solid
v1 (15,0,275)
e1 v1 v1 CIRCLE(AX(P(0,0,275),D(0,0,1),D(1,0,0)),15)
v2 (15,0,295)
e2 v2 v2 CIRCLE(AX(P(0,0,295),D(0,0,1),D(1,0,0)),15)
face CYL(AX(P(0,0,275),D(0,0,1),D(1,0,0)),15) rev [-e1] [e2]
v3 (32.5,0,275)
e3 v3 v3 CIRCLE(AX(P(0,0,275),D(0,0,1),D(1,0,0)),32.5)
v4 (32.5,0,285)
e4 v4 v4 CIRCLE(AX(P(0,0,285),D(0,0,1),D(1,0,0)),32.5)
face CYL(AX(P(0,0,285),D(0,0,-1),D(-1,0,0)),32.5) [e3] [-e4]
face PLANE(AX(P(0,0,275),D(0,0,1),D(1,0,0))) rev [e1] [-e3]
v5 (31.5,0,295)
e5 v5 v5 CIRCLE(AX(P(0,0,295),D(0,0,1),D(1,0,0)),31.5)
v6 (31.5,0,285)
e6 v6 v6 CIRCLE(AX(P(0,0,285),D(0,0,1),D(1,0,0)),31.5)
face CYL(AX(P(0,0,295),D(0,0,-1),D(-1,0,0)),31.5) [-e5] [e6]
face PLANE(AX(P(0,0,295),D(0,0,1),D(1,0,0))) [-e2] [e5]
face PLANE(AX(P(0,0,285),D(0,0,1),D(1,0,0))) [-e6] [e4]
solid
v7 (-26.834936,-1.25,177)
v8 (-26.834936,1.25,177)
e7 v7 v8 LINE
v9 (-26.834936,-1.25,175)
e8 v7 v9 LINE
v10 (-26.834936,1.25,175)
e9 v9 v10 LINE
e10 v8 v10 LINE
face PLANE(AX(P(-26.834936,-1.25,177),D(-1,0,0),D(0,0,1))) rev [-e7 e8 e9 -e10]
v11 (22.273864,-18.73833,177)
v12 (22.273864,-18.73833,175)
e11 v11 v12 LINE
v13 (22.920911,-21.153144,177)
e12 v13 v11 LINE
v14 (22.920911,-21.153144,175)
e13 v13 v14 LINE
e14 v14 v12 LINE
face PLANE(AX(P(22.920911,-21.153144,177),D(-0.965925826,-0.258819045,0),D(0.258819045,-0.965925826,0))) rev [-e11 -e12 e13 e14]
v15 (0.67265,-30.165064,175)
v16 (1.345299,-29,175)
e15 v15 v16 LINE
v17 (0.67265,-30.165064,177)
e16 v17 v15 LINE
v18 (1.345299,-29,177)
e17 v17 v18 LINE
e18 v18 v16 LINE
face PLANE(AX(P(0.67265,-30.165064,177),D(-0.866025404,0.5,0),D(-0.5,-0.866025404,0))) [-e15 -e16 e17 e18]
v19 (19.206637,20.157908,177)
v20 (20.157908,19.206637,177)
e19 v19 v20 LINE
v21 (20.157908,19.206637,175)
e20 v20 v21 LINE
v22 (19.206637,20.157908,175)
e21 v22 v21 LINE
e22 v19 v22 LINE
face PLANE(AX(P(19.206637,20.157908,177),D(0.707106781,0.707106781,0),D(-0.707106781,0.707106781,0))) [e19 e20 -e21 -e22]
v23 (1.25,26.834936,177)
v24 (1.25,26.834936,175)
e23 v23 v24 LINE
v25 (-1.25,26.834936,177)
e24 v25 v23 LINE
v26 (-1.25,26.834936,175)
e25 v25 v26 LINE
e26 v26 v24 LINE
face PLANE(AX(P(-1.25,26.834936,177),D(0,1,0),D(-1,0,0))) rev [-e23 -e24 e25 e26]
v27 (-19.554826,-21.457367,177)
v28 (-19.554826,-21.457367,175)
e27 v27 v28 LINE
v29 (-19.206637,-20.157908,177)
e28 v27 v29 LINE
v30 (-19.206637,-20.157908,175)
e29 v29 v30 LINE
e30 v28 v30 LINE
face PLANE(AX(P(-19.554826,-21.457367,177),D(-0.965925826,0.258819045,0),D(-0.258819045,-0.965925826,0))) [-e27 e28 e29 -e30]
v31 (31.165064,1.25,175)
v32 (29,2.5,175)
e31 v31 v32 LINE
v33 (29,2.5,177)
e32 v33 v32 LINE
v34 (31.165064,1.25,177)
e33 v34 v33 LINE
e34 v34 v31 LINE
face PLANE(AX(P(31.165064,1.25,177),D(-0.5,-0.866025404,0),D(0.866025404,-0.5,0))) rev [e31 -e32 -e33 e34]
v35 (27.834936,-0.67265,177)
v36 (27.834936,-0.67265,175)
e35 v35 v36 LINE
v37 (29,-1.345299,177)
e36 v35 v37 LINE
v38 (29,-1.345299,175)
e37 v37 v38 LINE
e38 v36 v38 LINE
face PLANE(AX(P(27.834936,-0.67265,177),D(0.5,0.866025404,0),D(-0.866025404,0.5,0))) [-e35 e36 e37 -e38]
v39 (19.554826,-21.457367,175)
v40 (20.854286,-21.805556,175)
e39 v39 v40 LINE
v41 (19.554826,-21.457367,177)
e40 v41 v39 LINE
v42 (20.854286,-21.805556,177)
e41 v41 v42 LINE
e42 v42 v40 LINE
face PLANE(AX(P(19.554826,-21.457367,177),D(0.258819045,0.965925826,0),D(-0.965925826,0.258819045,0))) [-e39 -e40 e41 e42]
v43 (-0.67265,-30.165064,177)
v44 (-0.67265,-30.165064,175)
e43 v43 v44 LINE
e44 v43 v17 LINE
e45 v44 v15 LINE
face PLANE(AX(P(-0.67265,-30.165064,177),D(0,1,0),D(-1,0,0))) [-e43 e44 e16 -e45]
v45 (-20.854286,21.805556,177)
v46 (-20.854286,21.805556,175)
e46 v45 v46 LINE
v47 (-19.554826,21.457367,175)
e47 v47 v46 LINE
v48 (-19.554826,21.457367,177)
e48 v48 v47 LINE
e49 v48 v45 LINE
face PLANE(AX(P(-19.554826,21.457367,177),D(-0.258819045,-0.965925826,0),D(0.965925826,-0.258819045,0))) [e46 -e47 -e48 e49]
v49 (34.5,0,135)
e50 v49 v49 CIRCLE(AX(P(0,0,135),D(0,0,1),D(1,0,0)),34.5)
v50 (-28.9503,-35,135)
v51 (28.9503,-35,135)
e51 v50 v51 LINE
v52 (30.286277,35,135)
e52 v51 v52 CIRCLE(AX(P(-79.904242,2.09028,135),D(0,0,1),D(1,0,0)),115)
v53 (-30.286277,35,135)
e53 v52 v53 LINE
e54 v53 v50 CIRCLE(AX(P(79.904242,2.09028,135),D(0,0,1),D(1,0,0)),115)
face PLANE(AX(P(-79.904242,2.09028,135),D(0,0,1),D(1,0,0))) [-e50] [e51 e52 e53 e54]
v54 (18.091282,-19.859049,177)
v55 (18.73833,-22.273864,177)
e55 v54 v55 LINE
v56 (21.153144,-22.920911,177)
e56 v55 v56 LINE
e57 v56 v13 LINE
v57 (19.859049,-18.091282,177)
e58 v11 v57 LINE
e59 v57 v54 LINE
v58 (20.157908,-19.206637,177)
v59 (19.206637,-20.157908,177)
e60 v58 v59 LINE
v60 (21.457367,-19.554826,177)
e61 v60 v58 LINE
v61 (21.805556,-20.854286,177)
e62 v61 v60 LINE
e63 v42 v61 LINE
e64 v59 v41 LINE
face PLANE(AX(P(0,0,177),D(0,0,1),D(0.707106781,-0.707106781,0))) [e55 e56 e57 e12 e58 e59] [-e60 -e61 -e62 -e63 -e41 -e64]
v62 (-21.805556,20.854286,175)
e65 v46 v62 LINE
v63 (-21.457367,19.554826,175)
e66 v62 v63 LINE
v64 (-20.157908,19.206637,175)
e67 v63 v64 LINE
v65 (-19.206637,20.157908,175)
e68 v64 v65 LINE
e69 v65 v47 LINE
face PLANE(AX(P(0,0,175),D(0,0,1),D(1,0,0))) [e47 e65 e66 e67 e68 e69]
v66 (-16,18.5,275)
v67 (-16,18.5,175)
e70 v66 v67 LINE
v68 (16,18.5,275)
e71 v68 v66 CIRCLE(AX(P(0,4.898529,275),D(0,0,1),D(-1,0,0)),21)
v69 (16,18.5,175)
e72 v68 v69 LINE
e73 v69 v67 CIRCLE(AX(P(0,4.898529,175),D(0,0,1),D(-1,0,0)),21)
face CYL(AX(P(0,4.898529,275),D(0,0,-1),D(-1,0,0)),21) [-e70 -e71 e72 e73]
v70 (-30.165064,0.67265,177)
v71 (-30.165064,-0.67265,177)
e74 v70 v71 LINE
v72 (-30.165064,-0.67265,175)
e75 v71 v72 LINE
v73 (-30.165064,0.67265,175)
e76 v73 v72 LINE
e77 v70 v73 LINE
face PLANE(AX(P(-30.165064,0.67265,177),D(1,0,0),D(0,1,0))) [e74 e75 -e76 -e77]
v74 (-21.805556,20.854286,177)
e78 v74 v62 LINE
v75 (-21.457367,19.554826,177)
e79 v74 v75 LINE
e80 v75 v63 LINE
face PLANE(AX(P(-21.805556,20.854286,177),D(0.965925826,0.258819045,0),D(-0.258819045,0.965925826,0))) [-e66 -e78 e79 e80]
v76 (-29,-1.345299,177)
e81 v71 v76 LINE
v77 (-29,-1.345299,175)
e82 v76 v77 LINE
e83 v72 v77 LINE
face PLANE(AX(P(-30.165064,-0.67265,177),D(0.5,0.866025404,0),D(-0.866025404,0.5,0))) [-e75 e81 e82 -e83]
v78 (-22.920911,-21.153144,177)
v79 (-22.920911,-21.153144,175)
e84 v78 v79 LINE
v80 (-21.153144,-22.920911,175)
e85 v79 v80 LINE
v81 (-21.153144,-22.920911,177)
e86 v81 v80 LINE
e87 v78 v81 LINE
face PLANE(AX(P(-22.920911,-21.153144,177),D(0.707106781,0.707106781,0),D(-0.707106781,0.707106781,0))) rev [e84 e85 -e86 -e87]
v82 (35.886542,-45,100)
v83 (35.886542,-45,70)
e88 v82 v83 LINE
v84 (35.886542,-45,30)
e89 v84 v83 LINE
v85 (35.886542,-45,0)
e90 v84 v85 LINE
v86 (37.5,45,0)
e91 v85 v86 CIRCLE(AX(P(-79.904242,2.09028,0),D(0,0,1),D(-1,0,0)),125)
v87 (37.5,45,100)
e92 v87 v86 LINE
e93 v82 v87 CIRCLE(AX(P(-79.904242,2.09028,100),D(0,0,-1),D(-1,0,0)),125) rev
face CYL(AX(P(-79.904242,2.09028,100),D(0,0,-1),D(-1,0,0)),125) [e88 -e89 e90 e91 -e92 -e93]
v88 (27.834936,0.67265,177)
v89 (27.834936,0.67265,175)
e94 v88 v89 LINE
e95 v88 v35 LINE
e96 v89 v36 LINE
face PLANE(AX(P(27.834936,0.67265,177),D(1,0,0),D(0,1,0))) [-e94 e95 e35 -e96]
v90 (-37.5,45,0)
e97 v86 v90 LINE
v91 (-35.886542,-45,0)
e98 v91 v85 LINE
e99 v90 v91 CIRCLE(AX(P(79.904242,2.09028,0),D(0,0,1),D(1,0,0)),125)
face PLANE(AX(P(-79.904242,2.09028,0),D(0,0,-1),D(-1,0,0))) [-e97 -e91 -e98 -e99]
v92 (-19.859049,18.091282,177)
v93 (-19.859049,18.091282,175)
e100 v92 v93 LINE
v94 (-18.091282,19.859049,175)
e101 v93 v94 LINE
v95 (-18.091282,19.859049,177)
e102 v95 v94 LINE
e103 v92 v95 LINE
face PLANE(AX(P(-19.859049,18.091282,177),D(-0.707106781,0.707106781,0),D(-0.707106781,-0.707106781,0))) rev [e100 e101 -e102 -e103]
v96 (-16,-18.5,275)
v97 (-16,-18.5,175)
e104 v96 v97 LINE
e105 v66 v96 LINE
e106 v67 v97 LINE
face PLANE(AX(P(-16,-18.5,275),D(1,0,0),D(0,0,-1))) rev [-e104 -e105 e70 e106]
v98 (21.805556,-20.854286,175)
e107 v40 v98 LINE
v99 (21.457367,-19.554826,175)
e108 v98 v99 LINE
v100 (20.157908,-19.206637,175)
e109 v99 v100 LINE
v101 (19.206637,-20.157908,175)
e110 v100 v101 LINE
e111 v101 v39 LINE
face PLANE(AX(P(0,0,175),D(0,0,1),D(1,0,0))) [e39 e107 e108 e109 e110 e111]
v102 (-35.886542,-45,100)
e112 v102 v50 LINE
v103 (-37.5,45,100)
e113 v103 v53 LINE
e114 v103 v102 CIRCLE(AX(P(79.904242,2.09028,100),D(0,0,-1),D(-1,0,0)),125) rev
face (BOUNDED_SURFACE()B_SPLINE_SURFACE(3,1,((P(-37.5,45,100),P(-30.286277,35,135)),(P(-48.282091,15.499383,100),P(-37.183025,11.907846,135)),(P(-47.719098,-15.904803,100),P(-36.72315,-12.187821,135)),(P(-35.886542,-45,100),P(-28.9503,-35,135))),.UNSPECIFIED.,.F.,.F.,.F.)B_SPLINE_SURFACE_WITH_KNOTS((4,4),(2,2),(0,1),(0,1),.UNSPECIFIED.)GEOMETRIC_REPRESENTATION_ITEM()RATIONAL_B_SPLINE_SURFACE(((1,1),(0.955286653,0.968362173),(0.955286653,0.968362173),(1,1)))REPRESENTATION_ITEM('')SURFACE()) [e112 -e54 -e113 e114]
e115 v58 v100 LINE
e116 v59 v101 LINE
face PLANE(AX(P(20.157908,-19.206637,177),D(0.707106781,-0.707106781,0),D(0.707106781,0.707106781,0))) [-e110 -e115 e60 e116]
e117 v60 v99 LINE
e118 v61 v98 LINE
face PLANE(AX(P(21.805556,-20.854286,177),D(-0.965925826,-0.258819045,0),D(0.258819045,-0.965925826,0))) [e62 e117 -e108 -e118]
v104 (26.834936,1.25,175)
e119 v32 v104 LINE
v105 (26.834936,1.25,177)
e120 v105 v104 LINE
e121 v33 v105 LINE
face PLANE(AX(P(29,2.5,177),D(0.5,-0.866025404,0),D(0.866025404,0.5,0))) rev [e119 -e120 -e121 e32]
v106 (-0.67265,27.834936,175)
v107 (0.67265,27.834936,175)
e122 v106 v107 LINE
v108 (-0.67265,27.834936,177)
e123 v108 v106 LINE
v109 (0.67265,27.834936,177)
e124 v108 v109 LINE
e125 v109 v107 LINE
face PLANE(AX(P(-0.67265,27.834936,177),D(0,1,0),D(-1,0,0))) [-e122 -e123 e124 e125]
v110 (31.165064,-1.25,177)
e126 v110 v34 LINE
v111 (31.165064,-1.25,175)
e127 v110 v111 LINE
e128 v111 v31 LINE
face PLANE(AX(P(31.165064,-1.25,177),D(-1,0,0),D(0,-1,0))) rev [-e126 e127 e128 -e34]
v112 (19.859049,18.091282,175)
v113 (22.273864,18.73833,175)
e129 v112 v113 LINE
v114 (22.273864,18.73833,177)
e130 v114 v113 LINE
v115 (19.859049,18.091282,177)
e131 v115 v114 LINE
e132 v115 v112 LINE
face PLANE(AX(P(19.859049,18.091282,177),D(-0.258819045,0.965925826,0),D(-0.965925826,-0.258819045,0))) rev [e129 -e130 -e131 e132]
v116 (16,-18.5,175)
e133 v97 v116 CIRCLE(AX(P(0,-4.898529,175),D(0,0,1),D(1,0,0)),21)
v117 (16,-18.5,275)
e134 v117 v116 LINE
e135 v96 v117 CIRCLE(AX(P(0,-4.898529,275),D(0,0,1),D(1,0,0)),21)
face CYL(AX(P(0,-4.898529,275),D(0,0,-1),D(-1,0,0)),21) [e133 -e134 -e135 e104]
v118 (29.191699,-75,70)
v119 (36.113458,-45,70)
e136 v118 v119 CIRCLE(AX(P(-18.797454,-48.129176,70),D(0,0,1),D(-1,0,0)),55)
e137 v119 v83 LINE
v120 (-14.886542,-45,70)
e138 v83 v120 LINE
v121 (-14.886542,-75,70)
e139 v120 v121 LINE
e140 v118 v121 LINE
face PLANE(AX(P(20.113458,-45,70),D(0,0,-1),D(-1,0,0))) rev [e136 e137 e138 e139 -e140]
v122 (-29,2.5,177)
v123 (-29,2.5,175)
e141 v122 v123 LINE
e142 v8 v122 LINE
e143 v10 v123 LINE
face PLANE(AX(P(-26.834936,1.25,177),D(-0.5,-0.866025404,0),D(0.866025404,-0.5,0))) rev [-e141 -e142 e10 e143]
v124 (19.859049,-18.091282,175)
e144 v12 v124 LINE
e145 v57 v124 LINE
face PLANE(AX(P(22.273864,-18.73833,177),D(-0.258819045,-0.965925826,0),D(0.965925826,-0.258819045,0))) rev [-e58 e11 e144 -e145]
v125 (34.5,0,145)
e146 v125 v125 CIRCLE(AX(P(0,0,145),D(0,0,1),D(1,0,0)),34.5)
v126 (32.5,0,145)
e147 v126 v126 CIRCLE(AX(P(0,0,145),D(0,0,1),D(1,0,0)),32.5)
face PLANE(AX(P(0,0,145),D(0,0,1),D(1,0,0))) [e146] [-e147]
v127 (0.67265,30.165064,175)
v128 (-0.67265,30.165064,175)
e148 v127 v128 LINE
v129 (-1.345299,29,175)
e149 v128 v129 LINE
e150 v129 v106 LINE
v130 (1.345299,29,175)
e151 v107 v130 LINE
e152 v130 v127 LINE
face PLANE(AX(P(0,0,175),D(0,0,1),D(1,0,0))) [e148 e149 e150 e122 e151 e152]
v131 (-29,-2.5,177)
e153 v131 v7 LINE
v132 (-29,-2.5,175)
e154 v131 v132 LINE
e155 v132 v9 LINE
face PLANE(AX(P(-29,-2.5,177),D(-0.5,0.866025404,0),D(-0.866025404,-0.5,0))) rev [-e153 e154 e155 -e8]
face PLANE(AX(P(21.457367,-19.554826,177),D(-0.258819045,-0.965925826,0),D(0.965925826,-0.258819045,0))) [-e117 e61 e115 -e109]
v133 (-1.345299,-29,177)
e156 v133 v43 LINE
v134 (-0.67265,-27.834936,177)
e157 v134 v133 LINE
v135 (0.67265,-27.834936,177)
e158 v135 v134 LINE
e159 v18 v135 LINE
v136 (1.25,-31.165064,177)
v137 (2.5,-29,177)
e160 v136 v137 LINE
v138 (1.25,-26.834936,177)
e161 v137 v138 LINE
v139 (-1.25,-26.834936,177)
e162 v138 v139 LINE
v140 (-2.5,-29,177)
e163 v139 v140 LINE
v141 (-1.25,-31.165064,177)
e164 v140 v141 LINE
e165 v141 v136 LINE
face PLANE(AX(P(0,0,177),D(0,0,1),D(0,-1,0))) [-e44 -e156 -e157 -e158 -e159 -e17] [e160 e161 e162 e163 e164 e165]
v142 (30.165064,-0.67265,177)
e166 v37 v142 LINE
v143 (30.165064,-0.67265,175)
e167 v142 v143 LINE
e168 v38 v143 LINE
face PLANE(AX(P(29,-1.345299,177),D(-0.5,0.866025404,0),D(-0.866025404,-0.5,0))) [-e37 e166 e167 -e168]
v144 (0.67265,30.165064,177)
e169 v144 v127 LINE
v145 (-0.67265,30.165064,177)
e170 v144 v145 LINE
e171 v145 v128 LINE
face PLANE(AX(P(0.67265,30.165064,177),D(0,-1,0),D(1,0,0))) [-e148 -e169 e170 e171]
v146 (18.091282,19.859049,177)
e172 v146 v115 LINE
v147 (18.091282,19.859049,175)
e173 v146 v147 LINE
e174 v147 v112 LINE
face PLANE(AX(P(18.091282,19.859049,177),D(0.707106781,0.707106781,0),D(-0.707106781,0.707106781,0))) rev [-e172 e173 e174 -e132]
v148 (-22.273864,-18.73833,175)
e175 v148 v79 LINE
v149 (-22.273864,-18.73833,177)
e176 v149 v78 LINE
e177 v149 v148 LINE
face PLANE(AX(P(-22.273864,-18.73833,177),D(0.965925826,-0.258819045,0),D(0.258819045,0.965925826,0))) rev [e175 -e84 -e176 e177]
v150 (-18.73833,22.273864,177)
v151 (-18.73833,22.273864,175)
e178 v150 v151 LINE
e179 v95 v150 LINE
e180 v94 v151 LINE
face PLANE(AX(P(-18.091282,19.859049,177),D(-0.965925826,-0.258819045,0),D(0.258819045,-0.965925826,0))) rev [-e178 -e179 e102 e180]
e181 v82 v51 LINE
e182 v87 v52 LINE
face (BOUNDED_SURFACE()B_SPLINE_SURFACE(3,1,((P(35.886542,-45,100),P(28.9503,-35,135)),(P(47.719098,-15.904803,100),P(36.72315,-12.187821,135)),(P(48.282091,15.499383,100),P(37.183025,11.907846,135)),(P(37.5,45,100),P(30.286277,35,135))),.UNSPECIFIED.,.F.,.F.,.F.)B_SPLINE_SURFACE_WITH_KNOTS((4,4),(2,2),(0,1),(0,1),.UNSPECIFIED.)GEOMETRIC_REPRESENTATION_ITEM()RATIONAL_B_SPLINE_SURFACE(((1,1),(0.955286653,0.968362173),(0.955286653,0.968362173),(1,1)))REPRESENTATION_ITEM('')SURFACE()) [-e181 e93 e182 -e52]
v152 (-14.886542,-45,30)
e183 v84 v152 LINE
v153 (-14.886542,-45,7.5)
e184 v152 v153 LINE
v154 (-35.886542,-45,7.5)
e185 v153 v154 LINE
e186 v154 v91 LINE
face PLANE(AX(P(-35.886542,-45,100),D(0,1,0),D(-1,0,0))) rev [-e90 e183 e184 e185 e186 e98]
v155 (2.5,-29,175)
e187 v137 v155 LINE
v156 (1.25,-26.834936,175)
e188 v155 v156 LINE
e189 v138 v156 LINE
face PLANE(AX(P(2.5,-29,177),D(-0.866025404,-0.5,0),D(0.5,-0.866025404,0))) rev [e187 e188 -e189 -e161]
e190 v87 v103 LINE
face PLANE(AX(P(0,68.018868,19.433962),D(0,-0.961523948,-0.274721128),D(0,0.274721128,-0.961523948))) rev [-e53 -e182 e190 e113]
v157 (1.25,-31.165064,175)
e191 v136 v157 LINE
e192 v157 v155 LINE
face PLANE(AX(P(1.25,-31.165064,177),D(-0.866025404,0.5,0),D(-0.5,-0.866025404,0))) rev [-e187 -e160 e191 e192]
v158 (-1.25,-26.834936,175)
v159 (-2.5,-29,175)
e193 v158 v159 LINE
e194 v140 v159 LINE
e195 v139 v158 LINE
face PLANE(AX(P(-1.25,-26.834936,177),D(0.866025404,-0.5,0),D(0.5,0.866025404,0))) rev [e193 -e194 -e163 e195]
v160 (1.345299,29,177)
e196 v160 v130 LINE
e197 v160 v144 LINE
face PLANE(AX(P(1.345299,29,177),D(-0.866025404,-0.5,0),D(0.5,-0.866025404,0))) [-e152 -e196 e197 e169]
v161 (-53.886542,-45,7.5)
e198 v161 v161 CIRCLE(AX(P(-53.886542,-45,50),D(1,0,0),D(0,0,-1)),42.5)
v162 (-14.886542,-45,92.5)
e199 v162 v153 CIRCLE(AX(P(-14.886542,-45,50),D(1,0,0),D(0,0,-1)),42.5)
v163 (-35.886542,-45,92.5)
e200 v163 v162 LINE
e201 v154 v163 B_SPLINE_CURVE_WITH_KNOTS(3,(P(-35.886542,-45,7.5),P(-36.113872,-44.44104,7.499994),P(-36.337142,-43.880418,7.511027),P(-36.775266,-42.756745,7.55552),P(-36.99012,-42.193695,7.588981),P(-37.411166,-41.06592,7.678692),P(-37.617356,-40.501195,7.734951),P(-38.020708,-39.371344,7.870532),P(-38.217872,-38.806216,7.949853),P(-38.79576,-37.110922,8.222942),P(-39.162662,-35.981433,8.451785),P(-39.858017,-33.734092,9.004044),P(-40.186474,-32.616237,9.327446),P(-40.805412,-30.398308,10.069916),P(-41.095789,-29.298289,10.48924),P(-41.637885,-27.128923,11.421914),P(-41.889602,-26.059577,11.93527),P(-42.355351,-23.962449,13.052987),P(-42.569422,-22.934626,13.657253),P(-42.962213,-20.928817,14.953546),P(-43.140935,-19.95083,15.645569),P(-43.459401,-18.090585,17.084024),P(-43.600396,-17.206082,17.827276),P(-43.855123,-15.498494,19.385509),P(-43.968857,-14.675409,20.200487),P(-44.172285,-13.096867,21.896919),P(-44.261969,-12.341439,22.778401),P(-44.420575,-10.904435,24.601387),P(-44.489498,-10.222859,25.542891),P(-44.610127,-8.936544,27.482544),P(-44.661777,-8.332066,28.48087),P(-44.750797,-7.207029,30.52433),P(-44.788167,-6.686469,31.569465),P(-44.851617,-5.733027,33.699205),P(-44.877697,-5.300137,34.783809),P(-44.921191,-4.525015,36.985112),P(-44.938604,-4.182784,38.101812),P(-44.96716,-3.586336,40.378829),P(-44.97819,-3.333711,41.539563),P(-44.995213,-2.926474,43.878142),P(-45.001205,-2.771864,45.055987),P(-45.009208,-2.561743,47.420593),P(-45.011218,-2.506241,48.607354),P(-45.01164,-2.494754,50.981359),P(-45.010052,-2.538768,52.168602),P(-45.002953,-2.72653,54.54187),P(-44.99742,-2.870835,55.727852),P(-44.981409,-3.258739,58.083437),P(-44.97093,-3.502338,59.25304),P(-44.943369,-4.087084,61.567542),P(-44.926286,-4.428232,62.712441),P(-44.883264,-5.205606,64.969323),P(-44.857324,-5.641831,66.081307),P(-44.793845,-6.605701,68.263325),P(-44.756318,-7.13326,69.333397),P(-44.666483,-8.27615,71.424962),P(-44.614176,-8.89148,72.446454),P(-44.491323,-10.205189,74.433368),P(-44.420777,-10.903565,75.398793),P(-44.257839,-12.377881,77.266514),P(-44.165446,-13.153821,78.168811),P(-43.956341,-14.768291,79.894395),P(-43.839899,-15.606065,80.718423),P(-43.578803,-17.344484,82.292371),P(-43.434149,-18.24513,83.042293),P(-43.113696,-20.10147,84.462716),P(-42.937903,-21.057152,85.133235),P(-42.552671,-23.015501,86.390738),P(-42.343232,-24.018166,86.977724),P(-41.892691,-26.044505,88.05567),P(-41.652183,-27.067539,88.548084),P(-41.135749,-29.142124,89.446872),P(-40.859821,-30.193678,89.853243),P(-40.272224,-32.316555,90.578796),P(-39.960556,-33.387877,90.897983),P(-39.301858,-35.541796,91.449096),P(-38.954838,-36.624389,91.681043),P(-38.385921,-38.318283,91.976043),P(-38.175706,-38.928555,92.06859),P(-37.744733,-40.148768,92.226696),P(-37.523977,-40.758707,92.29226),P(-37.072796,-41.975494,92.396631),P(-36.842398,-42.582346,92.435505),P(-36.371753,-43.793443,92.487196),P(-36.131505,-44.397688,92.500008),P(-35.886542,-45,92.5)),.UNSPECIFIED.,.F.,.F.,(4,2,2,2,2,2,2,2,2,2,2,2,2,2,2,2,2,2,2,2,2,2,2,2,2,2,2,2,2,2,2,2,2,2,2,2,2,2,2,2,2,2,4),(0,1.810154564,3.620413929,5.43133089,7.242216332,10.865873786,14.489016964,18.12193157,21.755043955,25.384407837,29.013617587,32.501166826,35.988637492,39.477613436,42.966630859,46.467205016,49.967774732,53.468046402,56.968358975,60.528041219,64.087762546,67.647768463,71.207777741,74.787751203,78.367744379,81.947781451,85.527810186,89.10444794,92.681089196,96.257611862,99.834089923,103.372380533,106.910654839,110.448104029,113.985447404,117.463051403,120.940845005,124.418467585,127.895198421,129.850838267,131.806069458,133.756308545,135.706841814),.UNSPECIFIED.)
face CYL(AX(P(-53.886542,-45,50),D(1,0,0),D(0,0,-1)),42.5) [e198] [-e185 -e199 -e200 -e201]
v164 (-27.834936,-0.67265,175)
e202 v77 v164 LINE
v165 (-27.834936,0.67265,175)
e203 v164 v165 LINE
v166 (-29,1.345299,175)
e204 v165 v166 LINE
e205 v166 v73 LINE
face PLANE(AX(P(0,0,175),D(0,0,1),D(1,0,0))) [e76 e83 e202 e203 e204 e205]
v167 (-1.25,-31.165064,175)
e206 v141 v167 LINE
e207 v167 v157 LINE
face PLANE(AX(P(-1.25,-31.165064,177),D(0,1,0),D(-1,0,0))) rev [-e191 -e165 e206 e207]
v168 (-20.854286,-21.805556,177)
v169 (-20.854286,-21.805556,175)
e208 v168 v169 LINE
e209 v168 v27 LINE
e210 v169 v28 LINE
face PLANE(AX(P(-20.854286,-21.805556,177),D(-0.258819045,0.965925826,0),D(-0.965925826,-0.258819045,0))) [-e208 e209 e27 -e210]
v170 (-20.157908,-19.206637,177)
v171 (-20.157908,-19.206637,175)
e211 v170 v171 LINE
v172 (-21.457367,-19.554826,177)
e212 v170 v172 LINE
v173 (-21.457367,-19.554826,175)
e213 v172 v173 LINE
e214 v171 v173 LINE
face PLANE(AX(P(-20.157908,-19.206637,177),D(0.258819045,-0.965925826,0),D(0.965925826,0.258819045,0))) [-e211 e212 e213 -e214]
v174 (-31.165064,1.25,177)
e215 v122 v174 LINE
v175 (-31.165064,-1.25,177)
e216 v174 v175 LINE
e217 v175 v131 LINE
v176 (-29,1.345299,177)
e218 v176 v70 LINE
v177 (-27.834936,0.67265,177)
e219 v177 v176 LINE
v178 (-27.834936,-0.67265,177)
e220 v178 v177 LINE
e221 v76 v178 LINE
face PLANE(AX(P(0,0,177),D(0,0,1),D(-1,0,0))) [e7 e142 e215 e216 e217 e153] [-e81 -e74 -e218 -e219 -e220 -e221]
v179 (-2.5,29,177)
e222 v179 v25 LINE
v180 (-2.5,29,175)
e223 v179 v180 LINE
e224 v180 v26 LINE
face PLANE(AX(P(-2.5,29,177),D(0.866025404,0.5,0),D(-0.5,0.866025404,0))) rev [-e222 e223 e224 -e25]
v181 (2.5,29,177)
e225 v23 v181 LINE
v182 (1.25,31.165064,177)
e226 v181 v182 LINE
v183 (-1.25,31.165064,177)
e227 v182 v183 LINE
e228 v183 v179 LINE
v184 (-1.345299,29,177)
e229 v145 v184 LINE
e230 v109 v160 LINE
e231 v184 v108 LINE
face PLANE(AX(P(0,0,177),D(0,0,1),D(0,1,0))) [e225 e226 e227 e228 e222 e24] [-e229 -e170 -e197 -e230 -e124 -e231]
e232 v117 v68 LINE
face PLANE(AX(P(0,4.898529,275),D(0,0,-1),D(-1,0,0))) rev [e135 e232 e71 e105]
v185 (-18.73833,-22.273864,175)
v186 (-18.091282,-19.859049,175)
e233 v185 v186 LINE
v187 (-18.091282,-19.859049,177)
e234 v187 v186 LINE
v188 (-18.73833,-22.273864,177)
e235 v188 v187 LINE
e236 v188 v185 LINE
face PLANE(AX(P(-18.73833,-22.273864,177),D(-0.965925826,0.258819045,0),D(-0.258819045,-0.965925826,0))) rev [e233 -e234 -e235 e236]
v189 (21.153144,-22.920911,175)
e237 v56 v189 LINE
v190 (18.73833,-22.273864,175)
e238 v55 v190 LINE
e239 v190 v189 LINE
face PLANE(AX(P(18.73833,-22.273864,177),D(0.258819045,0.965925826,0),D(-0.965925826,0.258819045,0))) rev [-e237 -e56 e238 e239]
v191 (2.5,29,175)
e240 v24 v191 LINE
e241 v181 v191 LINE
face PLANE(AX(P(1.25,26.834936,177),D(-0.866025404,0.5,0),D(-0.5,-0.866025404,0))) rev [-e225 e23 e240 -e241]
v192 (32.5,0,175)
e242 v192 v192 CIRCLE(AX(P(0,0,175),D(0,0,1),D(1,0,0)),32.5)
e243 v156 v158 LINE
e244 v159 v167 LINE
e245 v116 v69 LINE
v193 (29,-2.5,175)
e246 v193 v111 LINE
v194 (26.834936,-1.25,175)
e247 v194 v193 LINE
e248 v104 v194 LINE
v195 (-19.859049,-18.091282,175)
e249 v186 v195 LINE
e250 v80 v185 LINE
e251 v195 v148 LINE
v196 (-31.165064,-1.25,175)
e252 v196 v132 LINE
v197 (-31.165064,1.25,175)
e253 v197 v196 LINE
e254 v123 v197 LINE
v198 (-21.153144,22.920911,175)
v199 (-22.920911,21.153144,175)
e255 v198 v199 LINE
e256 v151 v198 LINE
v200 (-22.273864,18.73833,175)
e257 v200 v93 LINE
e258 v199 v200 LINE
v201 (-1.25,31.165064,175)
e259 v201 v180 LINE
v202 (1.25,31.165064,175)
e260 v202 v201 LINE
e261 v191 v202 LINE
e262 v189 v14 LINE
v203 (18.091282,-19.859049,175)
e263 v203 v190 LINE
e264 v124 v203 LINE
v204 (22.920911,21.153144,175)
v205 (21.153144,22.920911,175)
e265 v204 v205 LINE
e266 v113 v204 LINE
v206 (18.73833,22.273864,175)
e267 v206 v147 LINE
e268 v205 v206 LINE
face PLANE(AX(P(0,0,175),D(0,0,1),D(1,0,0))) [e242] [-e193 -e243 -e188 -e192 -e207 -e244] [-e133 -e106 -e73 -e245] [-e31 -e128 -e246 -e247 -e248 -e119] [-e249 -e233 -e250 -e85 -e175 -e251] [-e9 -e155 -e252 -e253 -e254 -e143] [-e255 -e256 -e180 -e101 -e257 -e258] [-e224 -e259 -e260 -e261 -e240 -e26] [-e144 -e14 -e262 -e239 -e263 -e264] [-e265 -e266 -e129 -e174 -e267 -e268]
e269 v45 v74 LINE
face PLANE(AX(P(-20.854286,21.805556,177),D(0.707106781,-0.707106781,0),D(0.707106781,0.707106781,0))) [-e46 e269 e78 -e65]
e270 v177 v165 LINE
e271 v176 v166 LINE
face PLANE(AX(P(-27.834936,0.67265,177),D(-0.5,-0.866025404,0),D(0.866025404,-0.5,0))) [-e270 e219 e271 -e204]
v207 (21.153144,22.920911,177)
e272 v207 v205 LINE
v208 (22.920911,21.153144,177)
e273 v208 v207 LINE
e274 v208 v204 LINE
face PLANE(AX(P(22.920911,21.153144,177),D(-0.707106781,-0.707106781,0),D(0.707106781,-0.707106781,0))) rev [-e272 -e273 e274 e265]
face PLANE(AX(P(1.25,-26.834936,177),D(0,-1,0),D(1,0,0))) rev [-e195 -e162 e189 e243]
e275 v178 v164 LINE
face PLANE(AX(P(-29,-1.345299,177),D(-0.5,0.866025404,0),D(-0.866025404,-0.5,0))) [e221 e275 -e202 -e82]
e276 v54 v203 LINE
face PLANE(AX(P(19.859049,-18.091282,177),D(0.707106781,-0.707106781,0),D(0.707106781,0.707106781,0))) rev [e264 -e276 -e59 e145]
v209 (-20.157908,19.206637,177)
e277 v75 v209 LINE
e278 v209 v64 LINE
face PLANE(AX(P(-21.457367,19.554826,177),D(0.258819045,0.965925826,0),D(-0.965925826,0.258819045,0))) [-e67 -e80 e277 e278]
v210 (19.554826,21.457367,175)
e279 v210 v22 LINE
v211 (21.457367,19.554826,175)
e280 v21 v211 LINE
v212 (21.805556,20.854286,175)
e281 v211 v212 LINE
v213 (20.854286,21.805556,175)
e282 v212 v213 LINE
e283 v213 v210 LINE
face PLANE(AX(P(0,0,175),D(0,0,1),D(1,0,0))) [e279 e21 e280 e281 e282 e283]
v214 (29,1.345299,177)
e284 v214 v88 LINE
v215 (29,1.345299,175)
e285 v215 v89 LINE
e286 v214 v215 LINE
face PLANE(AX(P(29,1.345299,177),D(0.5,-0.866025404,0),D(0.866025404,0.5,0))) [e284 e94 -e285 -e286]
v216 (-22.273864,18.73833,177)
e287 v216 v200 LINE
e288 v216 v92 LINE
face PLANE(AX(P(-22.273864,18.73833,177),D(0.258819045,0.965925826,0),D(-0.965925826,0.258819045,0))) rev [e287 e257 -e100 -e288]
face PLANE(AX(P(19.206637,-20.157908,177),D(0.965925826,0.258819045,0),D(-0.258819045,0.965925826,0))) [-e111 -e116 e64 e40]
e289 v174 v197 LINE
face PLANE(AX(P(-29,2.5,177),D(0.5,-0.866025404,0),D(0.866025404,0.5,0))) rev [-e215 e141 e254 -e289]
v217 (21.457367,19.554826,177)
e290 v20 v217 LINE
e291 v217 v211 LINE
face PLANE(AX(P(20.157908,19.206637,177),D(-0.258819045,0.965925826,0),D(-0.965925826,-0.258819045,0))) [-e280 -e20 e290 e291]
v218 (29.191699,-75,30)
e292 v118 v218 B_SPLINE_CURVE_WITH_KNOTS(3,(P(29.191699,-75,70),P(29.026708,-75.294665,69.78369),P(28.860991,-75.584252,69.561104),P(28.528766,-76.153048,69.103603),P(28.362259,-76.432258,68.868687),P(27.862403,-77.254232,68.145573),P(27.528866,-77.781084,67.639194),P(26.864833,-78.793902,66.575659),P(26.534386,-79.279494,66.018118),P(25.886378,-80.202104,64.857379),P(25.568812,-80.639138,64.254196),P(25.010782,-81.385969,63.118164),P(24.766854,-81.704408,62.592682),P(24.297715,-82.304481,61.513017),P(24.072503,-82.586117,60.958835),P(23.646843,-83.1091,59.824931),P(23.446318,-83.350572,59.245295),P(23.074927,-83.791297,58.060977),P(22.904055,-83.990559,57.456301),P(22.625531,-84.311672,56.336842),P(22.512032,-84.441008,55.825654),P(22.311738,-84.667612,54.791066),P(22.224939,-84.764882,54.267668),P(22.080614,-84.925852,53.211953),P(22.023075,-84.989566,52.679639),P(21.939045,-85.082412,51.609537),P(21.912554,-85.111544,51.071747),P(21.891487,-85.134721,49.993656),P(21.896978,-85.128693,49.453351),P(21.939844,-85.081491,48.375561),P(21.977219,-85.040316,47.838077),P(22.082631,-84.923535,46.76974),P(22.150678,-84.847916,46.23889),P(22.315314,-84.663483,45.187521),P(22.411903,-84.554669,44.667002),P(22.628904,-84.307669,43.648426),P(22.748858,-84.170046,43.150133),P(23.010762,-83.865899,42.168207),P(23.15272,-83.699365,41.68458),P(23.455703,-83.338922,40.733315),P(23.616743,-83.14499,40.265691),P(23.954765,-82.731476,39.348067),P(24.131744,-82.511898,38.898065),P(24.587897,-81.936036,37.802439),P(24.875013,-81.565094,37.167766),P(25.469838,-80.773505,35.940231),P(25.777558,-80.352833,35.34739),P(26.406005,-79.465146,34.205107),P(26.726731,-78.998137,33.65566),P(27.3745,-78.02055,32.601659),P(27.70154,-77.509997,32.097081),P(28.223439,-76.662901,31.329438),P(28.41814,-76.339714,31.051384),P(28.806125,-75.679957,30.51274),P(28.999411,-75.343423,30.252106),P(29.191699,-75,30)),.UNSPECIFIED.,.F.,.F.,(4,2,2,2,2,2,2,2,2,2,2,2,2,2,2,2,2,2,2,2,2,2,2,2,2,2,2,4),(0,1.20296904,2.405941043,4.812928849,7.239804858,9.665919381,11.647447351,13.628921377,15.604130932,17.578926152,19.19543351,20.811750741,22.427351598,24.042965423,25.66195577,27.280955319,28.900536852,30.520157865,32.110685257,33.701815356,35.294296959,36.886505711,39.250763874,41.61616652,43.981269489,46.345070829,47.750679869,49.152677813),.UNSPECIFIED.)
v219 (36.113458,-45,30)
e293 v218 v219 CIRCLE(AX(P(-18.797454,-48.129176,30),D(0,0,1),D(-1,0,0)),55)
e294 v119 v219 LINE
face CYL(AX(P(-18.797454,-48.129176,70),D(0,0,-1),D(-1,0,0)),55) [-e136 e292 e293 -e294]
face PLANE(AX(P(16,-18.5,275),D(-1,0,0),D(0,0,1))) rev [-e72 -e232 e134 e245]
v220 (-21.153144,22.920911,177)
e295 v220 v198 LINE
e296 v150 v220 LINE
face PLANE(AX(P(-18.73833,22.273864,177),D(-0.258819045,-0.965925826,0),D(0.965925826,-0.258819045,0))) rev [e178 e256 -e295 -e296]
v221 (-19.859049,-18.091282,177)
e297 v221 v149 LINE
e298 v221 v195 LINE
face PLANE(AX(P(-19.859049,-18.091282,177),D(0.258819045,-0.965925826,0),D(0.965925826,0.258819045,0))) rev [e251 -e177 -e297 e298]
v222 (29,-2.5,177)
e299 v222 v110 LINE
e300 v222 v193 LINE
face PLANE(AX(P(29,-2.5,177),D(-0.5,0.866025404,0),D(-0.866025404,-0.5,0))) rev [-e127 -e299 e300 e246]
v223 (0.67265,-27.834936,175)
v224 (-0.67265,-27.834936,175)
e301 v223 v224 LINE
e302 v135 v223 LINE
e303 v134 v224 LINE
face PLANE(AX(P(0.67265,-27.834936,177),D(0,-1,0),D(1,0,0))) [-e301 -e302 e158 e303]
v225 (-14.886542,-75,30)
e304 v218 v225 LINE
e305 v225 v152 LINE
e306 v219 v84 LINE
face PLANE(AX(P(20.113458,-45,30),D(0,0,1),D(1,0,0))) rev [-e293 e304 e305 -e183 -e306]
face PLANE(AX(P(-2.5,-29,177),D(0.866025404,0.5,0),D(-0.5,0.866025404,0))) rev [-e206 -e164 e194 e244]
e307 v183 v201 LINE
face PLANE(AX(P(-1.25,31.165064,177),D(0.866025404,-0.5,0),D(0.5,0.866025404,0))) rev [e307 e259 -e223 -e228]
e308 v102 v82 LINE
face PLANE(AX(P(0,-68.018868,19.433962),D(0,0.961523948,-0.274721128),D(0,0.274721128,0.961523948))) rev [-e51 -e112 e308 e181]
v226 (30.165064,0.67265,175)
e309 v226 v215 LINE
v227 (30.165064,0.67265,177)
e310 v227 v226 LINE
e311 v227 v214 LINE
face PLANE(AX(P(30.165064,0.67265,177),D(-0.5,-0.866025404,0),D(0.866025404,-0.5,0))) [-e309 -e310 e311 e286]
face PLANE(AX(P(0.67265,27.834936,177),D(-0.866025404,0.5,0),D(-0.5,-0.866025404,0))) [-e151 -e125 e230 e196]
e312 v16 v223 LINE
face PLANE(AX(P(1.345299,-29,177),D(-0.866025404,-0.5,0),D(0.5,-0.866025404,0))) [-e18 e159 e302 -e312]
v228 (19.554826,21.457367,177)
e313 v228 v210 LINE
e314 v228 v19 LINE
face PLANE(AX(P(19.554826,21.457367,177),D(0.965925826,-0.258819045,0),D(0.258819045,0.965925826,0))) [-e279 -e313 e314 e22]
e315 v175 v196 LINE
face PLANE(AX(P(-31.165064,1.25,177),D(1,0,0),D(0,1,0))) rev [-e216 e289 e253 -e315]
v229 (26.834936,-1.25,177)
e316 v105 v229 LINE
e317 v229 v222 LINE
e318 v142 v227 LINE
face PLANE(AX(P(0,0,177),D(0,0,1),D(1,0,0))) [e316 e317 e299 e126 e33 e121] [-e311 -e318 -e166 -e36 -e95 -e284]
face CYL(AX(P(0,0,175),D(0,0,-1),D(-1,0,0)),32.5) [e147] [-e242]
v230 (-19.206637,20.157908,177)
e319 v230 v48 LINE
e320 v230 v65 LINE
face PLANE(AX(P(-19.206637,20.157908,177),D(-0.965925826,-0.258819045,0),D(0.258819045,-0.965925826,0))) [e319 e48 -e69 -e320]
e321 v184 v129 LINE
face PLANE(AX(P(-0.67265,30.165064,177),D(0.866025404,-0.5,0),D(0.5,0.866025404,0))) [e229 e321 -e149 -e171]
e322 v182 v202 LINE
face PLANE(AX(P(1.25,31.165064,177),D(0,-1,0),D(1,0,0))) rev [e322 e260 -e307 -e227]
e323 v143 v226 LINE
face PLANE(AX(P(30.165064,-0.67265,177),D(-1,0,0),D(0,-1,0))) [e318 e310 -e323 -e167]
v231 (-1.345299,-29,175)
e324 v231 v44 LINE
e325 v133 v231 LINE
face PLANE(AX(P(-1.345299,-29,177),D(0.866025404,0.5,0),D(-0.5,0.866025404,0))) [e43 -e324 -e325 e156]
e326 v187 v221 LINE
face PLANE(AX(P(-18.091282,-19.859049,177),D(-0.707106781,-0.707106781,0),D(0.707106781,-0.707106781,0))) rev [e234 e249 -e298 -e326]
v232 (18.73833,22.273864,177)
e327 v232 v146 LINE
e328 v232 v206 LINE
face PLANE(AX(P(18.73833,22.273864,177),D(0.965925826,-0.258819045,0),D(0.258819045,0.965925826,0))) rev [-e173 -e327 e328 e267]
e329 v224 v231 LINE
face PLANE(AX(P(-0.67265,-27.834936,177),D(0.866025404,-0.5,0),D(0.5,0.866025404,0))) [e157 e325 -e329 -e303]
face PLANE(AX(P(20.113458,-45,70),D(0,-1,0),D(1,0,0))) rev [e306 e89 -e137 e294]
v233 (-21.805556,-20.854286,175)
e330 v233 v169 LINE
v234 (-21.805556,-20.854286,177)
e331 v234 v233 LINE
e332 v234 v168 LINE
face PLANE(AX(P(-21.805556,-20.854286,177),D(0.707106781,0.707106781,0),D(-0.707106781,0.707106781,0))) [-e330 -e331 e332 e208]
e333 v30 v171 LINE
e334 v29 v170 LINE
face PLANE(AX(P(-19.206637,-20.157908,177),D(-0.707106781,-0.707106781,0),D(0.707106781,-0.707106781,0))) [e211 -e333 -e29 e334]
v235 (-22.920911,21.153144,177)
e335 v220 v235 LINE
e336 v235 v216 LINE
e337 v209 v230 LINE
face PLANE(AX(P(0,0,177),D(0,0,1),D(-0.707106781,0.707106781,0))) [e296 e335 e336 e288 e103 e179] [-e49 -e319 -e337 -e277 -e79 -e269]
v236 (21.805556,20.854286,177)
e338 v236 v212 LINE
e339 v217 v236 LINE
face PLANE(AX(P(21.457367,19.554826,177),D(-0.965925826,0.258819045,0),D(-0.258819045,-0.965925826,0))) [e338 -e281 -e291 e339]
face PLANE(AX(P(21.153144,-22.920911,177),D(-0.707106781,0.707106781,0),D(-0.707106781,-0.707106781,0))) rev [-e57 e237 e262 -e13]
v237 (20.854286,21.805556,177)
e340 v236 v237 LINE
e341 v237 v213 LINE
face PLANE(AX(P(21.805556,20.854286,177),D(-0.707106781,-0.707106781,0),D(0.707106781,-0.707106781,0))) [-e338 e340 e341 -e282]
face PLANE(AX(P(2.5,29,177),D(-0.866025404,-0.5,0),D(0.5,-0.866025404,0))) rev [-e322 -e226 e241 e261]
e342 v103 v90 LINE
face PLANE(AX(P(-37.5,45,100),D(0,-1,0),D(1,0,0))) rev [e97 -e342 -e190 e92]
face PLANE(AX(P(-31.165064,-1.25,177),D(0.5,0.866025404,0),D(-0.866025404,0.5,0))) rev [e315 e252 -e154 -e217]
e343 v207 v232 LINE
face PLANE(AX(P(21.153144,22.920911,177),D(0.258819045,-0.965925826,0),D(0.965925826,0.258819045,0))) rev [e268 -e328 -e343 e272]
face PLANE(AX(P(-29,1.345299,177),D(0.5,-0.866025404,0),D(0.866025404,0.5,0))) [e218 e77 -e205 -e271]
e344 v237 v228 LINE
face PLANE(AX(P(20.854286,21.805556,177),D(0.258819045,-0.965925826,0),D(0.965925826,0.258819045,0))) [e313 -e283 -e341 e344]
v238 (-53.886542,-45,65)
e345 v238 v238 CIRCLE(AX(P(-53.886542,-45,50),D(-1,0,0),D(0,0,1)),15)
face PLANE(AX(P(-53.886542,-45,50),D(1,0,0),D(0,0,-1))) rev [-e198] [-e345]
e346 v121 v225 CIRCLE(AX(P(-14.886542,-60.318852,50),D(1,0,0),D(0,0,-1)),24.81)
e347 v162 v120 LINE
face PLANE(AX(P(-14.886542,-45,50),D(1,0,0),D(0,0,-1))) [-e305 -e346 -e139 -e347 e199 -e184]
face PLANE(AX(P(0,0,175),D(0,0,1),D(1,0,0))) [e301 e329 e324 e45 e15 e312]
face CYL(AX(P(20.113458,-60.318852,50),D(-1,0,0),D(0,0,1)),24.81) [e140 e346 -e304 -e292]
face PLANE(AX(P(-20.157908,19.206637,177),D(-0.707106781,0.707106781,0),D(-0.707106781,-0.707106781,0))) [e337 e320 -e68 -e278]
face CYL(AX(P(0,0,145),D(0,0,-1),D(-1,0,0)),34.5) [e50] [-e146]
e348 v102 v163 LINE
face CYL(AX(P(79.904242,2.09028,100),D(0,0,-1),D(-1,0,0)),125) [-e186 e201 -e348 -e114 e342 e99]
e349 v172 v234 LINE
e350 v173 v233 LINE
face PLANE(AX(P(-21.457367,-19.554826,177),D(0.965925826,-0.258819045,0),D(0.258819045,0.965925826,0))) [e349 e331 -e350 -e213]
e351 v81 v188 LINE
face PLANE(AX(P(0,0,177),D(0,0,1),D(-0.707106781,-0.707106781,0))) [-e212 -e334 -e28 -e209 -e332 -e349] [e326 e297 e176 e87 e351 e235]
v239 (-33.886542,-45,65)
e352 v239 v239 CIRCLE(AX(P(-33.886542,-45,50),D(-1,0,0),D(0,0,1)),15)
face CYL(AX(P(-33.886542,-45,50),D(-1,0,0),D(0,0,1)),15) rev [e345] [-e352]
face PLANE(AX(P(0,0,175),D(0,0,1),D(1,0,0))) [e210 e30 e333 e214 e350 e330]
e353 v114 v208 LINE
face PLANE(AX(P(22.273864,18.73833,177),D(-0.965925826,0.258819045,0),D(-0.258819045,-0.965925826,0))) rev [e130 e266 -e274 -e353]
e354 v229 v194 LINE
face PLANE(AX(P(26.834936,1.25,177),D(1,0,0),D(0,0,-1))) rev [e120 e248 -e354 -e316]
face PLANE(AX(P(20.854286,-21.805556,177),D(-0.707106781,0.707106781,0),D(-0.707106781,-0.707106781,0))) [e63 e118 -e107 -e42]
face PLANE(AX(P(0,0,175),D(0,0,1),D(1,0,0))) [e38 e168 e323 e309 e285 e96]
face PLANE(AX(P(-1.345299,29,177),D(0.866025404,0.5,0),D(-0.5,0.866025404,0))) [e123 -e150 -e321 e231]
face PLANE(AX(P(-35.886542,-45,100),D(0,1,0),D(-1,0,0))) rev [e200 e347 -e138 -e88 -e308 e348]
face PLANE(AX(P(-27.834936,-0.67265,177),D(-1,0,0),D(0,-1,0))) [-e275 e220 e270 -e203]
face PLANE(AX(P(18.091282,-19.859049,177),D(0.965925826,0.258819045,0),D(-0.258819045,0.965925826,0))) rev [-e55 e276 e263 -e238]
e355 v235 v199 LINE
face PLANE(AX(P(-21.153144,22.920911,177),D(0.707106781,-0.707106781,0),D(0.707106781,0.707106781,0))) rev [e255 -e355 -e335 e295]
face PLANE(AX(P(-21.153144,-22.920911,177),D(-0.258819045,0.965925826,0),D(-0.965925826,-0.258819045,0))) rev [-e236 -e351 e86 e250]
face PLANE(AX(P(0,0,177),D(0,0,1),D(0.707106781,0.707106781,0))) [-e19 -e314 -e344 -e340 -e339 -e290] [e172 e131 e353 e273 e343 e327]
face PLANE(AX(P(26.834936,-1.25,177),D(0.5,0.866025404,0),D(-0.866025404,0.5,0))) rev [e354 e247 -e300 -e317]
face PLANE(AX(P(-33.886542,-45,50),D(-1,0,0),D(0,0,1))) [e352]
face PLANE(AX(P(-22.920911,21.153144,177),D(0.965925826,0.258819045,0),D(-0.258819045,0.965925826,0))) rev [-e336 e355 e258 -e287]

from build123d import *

# Parameters (mm, degrees)
BOSS_EXTRU_1_DEPTH           = 100
ESQUISSE4_R                  = 34.5
BOSS_EXTRU_2_DEPTH           = 10
ESQUISSE5_R                  = 32.5
BOSS_EXTRU_3_DEPTH           = 30
BOSS_EXTRU_4_DEPTH           = 2
R_P_TITION_START             = 175
R_P_TITION_CIRCULAIRE1_DEPTH = 2
BOSS_EXTRU_5_DEPTH           = 100
ESQUISSE8_R                  = 32.5
BOSS_EXTRU_6_DEPTH           = 10
ESQUISSE9_R                  = 31.5
BOSS_EXTRU_7_DEPTH           = 10
BOSS_EXTRU_8_DEPTH           = 21
BOSS_EXTRU_8_DEPTH_BACK      = 18
ESQUISSE11_R                 = 42.5
BOSS_EXTRU_9_DEPTH           = 35
BOSS_EXTRU_10_DEPTH          = 20
BOSS_EXTRU_10_DEPTH_BACK     = 20
ENL_V_MAT_EXTRU_1_DEPTH      = 317.476302481
ESQUISSE15_R                 = 15
ENL_V_MAT_EXTRU_2_DEPTH      = 20
ESQUISSE16_R                 = 15
ENL_V_MAT_EXTRU_3_DEPTH      = 20


# Read off the part's stored shape, not the designer's step: Répétition circulaire1
with BuildPart() as part:
    # Esquisse1 → Boss.-Extru.1 (new body)
    with BuildSketch(Plane.XY):
        with BuildLine():
            Line((-37.5, 45), (37.5, 45))
            ThreePointArc((37.5, 45), (45.075676523, -0.150274002), (35.886541902, -45))
            Line((35.886541902, -45), (-35.886541902, -45))
            ThreePointArc((-35.886541902, -45), (-45.075676523, -0.150274002), (-37.5, 45))
        make_face()
    extrude(amount=BOSS_EXTRU_1_DEPTH)

    # Esquisse2 for Lissage2 → Lissage2 section 0
    with BuildSketch(Plane.XY.offset(100)):
        with BuildLine():
            Line((-35.886541902, -45), (35.886541902, -45))
            # circular arc as an exact rational Bezier (weights 1, cos(half-angle), 1)
            Bezier((35.886541902, -45), (54.060708359, -0.311351473), (37.5, 45), weights=[1, 0.93292998, 1])
            Line((37.5, 45), (-37.5, 45))
            Bezier((-37.5, 45), (-54.060708359, -0.311351473), (-35.886541902, -45), weights=[1, 0.93292998, 1])
        make_face()
    # Esquisse3 for Lissage2 → Lissage2 section 1
    with BuildSketch(Plane.XY.offset(135)):
        with BuildLine():
            Line((30.286276797, 35), (-30.286276797, 35))
            Bezier((-30.286276797, 35), (-40.80320151, -0.213468414), (-28.950299615, -35), weights=[1, 0.952543259, 1])
            Line((-28.950299615, -35), (28.950299615, -35))
            Bezier((28.950299615, -35), (40.80320151, -0.213468414), (30.286276797, 35), weights=[1, 0.952543259, 1])
        make_face()
    loft()

    # Esquisse4 → Boss.-Extru.2 (add)
    with BuildSketch(Plane.XY.offset(135)):
        Circle(ESQUISSE4_R)
    extrude(amount=BOSS_EXTRU_2_DEPTH)

    # Esquisse5 → Boss.-Extru.3 (add)
    with BuildSketch(Plane.XY.offset(145)):
        Circle(ESQUISSE5_R)
    extrude(amount=BOSS_EXTRU_3_DEPTH)

    # Esquisse6 → Boss.-Extru.4 (add)
    with BuildSketch(Plane.XY.offset(175)):
        Polygon((31.165063509, 1.25), (29, 2.5), (26.834936491, 1.25), (26.834936491, -1.25), (29, -2.5), (31.165063509, -1.25), align=None)
        Polygon((29, 1.345299462), (27.834936491, 0.672649731), (27.834936491, -0.672649731), (29, -1.345299462), (30.165063509, -0.672649731), (30.165063509, 0.672649731), align=None, mode=Mode.SUBTRACT)
    extrude(amount=BOSS_EXTRU_4_DEPTH)

    # Répétition circulaire1 outline → Répétition circulaire1 (add)
    # profile 1 of 7: a face of its own
    with BuildSketch(Plane.XY.offset(R_P_TITION_START)):
        Polygon((22.92091122, 21.153144267), (21.153144267, 22.92091122), (18.738329701, 22.273863607), (18.091282089, 19.859049042), (19.859049042, 18.091282089), (22.273863607, 18.738329701), align=None)
        Polygon((19.20663716, 20.157907532), (19.554826282, 21.457367026), (20.854285776, 21.805556148), (21.805556148, 20.854285776), (21.457367026, 19.554826282), (20.157907532, 19.20663716), align=None, mode=Mode.SUBTRACT)
    # profile 2 of 7: a face of its own
    with BuildSketch(Plane.XY.offset(R_P_TITION_START)):
        Polygon((21.153144267, -22.92091122), (22.92091122, -21.153144267), (22.273863607, -18.738329701), (19.859049042, -18.091282089), (18.091282089, -19.859049042), (18.738329701, -22.273863607), align=None)
        Polygon((20.157907532, -19.20663716), (21.457367026, -19.554826282), (21.805556148, -20.854285776), (20.854285776, -21.805556148), (19.554826282, -21.457367026), (19.20663716, -20.157907532), align=None, mode=Mode.SUBTRACT)
    # profile 3 of 7: a face of its own
    with BuildSketch(Plane.XY.offset(R_P_TITION_START)):
        Polygon((-1.25, -31.165063509), (1.25, -31.165063509), (2.5, -29), (1.25, -26.834936491), (-1.25, -26.834936491), (-2.5, -29), align=None)
        Polygon((0.672649731, -27.834936491), (1.345299462, -29), (0.672649731, -30.165063509), (-0.672649731, -30.165063509), (-1.345299462, -29), (-0.672649731, -27.834936491), align=None, mode=Mode.SUBTRACT)
    # profile 4 of 7: a face of its own
    with BuildSketch(Plane.XY.offset(R_P_TITION_START)):
        Polygon((-22.92091122, -21.153144267), (-21.153144267, -22.92091122), (-18.738329701, -22.273863607), (-18.091282089, -19.859049042), (-19.859049042, -18.091282089), (-22.273863607, -18.738329701), align=None)
        Polygon((-19.20663716, -20.157907532), (-19.554826282, -21.457367026), (-20.854285776, -21.805556148), (-21.805556148, -20.854285776), (-21.457367026, -19.554826282), (-20.157907532, -19.20663716), align=None, mode=Mode.SUBTRACT)
    # profile 5 of 7: a face of its own
    with BuildSketch(Plane.XY.offset(R_P_TITION_START)):
        Polygon((-31.165063509, 1.25), (-31.165063509, -1.25), (-29, -2.5), (-26.834936491, -1.25), (-26.834936491, 1.25), (-29, 2.5), align=None)
        Polygon((-27.834936491, -0.672649731), (-29, -1.345299462), (-30.165063509, -0.672649731), (-30.165063509, 0.672649731), (-29, 1.345299462), (-27.834936491, 0.672649731), align=None, mode=Mode.SUBTRACT)
    # profile 6 of 7: a face of its own
    with BuildSketch(Plane.XY.offset(R_P_TITION_START)):
        Polygon((-21.153144267, 22.92091122), (-22.92091122, 21.153144267), (-22.273863607, 18.738329701), (-19.859049042, 18.091282089), (-18.091282089, 19.859049042), (-18.738329701, 22.273863607), align=None)
        Polygon((-20.157907532, 19.20663716), (-21.457367026, 19.554826282), (-21.805556148, 20.854285776), (-20.854285776, 21.805556148), (-19.554826282, 21.457367026), (-19.20663716, 20.157907532), align=None, mode=Mode.SUBTRACT)
    # profile 7 of 7: a face of its own
    with BuildSketch(Plane.XY.offset(R_P_TITION_START)):
        Polygon((1.25, 31.165063509), (-1.25, 31.165063509), (-2.5, 29), (-1.25, 26.834936491), (1.25, 26.834936491), (2.5, 29), align=None)
        Polygon((-0.672649731, 27.834936491), (-1.345299462, 29), (-0.672649731, 30.165063509), (0.672649731, 30.165063509), (1.345299462, 29), (0.672649731, 27.834936491), align=None, mode=Mode.SUBTRACT)
    extrude(amount=R_P_TITION_CIRCULAIRE1_DEPTH)

    # Esquisse7 → Boss.-Extru.5 (add)
    with BuildSketch(Plane.XY.offset(175)):
        with BuildLine():
            Line((16, -18.5), (16, 18.5))
            ThreePointArc((16, 18.5), (0, 25.898529491), (-16, 18.5))
            Line((-16, 18.5), (-16, -18.5))
            ThreePointArc((-16, -18.5), (0, -25.898529491), (16, -18.5))
        make_face()
    extrude(amount=BOSS_EXTRU_5_DEPTH)

    # Esquisse11 → Boss.-Extru.8 (add, two sides: drawn at the far end of the back side and taken through both)
    with BuildSketch(Plane(origin=(-35.886541902, 0, 0), x_dir=(0, 0, -1), z_dir=(1, 0, 0)).offset(-BOSS_EXTRU_8_DEPTH_BACK)):
        with Locations((-50, -45)):
            Circle(ESQUISSE11_R)
    extrude(amount=BOSS_EXTRU_8_DEPTH + BOSS_EXTRU_8_DEPTH_BACK)

    # Esquisse12 → Boss.-Extru.9 (add)
    with BuildSketch(Plane(origin=(-14.886541902, 0, 0), x_dir=(0, 0, -1), z_dir=(1, 0, 0))):
        with BuildLine():
            Line((-70, -45), (-70, -75))
            ThreePointArc((-70, -75), (-50, -85.128852225), (-30, -75))
            Line((-30, -75), (-30, -45))
            Line((-30, -45), (-70, -45))
        make_face()
    extrude(amount=BOSS_EXTRU_9_DEPTH)

    # Esquisse13 → Boss.-Extru.10 (add, two sides: drawn at the far end of the back side and taken through both)
    with BuildSketch(Plane.XY.offset(50).offset(-BOSS_EXTRU_10_DEPTH_BACK)):
        with BuildLine():
            Line((20.113458098, -45), (20.113458098, -87))
            ThreePointArc((20.113458098, -87), (32.599371533, -67.708919404), (36.113458098, -45))
            Line((36.113458098, -45), (20.113458098, -45))
        make_face()
    extrude(amount=BOSS_EXTRU_10_DEPTH + BOSS_EXTRU_10_DEPTH_BACK)

    # Esquisse14 → Enlèv. mat.-Extru.1 (cut, through all)
    with BuildSketch(Plane.ZY.offset(-20.113458098)):
        with BuildLine():
            Line((70, -75), (70, -87))
            Line((70, -87), (30, -87))
            Line((30, -87), (30, -75))
            ThreePointArc((30, -75), (50, -85.128852225), (70, -75))
        make_face()
    extrude(amount=-ENL_V_MAT_EXTRU_1_DEPTH, mode=Mode.SUBTRACT)

    # Esquisse16 → Enlèv. mat.-Extru.3 (cut)
    with BuildSketch(Plane.ZY.offset(53.886541902)):
        with Locations((50, -45)):
            Circle(ESQUISSE16_R)
    extrude(amount=-ENL_V_MAT_EXTRU_3_DEPTH, mode=Mode.SUBTRACT)


with BuildPart() as body_2:
    # Esquisse8 → Boss.-Extru.6 (new body)
    with BuildSketch(Plane.XY.offset(275)):
        Circle(ESQUISSE8_R)
    extrude(amount=BOSS_EXTRU_6_DEPTH)

    # Esquisse9 → Boss.-Extru.7 (add)
    with BuildSketch(Plane.XY.offset(285)):
        Circle(ESQUISSE9_R)
    extrude(amount=BOSS_EXTRU_7_DEPTH)

    # Esquisse15 → Enlèv. mat.-Extru.2 (cut)
    with BuildSketch(Plane.XY.offset(295)):
        Circle(ESQUISSE15_R)
    extrude(amount=-ENL_V_MAT_EXTRU_2_DEPTH, mode=Mode.SUBTRACT)


solid = Compound([part.part, body_2.part])
